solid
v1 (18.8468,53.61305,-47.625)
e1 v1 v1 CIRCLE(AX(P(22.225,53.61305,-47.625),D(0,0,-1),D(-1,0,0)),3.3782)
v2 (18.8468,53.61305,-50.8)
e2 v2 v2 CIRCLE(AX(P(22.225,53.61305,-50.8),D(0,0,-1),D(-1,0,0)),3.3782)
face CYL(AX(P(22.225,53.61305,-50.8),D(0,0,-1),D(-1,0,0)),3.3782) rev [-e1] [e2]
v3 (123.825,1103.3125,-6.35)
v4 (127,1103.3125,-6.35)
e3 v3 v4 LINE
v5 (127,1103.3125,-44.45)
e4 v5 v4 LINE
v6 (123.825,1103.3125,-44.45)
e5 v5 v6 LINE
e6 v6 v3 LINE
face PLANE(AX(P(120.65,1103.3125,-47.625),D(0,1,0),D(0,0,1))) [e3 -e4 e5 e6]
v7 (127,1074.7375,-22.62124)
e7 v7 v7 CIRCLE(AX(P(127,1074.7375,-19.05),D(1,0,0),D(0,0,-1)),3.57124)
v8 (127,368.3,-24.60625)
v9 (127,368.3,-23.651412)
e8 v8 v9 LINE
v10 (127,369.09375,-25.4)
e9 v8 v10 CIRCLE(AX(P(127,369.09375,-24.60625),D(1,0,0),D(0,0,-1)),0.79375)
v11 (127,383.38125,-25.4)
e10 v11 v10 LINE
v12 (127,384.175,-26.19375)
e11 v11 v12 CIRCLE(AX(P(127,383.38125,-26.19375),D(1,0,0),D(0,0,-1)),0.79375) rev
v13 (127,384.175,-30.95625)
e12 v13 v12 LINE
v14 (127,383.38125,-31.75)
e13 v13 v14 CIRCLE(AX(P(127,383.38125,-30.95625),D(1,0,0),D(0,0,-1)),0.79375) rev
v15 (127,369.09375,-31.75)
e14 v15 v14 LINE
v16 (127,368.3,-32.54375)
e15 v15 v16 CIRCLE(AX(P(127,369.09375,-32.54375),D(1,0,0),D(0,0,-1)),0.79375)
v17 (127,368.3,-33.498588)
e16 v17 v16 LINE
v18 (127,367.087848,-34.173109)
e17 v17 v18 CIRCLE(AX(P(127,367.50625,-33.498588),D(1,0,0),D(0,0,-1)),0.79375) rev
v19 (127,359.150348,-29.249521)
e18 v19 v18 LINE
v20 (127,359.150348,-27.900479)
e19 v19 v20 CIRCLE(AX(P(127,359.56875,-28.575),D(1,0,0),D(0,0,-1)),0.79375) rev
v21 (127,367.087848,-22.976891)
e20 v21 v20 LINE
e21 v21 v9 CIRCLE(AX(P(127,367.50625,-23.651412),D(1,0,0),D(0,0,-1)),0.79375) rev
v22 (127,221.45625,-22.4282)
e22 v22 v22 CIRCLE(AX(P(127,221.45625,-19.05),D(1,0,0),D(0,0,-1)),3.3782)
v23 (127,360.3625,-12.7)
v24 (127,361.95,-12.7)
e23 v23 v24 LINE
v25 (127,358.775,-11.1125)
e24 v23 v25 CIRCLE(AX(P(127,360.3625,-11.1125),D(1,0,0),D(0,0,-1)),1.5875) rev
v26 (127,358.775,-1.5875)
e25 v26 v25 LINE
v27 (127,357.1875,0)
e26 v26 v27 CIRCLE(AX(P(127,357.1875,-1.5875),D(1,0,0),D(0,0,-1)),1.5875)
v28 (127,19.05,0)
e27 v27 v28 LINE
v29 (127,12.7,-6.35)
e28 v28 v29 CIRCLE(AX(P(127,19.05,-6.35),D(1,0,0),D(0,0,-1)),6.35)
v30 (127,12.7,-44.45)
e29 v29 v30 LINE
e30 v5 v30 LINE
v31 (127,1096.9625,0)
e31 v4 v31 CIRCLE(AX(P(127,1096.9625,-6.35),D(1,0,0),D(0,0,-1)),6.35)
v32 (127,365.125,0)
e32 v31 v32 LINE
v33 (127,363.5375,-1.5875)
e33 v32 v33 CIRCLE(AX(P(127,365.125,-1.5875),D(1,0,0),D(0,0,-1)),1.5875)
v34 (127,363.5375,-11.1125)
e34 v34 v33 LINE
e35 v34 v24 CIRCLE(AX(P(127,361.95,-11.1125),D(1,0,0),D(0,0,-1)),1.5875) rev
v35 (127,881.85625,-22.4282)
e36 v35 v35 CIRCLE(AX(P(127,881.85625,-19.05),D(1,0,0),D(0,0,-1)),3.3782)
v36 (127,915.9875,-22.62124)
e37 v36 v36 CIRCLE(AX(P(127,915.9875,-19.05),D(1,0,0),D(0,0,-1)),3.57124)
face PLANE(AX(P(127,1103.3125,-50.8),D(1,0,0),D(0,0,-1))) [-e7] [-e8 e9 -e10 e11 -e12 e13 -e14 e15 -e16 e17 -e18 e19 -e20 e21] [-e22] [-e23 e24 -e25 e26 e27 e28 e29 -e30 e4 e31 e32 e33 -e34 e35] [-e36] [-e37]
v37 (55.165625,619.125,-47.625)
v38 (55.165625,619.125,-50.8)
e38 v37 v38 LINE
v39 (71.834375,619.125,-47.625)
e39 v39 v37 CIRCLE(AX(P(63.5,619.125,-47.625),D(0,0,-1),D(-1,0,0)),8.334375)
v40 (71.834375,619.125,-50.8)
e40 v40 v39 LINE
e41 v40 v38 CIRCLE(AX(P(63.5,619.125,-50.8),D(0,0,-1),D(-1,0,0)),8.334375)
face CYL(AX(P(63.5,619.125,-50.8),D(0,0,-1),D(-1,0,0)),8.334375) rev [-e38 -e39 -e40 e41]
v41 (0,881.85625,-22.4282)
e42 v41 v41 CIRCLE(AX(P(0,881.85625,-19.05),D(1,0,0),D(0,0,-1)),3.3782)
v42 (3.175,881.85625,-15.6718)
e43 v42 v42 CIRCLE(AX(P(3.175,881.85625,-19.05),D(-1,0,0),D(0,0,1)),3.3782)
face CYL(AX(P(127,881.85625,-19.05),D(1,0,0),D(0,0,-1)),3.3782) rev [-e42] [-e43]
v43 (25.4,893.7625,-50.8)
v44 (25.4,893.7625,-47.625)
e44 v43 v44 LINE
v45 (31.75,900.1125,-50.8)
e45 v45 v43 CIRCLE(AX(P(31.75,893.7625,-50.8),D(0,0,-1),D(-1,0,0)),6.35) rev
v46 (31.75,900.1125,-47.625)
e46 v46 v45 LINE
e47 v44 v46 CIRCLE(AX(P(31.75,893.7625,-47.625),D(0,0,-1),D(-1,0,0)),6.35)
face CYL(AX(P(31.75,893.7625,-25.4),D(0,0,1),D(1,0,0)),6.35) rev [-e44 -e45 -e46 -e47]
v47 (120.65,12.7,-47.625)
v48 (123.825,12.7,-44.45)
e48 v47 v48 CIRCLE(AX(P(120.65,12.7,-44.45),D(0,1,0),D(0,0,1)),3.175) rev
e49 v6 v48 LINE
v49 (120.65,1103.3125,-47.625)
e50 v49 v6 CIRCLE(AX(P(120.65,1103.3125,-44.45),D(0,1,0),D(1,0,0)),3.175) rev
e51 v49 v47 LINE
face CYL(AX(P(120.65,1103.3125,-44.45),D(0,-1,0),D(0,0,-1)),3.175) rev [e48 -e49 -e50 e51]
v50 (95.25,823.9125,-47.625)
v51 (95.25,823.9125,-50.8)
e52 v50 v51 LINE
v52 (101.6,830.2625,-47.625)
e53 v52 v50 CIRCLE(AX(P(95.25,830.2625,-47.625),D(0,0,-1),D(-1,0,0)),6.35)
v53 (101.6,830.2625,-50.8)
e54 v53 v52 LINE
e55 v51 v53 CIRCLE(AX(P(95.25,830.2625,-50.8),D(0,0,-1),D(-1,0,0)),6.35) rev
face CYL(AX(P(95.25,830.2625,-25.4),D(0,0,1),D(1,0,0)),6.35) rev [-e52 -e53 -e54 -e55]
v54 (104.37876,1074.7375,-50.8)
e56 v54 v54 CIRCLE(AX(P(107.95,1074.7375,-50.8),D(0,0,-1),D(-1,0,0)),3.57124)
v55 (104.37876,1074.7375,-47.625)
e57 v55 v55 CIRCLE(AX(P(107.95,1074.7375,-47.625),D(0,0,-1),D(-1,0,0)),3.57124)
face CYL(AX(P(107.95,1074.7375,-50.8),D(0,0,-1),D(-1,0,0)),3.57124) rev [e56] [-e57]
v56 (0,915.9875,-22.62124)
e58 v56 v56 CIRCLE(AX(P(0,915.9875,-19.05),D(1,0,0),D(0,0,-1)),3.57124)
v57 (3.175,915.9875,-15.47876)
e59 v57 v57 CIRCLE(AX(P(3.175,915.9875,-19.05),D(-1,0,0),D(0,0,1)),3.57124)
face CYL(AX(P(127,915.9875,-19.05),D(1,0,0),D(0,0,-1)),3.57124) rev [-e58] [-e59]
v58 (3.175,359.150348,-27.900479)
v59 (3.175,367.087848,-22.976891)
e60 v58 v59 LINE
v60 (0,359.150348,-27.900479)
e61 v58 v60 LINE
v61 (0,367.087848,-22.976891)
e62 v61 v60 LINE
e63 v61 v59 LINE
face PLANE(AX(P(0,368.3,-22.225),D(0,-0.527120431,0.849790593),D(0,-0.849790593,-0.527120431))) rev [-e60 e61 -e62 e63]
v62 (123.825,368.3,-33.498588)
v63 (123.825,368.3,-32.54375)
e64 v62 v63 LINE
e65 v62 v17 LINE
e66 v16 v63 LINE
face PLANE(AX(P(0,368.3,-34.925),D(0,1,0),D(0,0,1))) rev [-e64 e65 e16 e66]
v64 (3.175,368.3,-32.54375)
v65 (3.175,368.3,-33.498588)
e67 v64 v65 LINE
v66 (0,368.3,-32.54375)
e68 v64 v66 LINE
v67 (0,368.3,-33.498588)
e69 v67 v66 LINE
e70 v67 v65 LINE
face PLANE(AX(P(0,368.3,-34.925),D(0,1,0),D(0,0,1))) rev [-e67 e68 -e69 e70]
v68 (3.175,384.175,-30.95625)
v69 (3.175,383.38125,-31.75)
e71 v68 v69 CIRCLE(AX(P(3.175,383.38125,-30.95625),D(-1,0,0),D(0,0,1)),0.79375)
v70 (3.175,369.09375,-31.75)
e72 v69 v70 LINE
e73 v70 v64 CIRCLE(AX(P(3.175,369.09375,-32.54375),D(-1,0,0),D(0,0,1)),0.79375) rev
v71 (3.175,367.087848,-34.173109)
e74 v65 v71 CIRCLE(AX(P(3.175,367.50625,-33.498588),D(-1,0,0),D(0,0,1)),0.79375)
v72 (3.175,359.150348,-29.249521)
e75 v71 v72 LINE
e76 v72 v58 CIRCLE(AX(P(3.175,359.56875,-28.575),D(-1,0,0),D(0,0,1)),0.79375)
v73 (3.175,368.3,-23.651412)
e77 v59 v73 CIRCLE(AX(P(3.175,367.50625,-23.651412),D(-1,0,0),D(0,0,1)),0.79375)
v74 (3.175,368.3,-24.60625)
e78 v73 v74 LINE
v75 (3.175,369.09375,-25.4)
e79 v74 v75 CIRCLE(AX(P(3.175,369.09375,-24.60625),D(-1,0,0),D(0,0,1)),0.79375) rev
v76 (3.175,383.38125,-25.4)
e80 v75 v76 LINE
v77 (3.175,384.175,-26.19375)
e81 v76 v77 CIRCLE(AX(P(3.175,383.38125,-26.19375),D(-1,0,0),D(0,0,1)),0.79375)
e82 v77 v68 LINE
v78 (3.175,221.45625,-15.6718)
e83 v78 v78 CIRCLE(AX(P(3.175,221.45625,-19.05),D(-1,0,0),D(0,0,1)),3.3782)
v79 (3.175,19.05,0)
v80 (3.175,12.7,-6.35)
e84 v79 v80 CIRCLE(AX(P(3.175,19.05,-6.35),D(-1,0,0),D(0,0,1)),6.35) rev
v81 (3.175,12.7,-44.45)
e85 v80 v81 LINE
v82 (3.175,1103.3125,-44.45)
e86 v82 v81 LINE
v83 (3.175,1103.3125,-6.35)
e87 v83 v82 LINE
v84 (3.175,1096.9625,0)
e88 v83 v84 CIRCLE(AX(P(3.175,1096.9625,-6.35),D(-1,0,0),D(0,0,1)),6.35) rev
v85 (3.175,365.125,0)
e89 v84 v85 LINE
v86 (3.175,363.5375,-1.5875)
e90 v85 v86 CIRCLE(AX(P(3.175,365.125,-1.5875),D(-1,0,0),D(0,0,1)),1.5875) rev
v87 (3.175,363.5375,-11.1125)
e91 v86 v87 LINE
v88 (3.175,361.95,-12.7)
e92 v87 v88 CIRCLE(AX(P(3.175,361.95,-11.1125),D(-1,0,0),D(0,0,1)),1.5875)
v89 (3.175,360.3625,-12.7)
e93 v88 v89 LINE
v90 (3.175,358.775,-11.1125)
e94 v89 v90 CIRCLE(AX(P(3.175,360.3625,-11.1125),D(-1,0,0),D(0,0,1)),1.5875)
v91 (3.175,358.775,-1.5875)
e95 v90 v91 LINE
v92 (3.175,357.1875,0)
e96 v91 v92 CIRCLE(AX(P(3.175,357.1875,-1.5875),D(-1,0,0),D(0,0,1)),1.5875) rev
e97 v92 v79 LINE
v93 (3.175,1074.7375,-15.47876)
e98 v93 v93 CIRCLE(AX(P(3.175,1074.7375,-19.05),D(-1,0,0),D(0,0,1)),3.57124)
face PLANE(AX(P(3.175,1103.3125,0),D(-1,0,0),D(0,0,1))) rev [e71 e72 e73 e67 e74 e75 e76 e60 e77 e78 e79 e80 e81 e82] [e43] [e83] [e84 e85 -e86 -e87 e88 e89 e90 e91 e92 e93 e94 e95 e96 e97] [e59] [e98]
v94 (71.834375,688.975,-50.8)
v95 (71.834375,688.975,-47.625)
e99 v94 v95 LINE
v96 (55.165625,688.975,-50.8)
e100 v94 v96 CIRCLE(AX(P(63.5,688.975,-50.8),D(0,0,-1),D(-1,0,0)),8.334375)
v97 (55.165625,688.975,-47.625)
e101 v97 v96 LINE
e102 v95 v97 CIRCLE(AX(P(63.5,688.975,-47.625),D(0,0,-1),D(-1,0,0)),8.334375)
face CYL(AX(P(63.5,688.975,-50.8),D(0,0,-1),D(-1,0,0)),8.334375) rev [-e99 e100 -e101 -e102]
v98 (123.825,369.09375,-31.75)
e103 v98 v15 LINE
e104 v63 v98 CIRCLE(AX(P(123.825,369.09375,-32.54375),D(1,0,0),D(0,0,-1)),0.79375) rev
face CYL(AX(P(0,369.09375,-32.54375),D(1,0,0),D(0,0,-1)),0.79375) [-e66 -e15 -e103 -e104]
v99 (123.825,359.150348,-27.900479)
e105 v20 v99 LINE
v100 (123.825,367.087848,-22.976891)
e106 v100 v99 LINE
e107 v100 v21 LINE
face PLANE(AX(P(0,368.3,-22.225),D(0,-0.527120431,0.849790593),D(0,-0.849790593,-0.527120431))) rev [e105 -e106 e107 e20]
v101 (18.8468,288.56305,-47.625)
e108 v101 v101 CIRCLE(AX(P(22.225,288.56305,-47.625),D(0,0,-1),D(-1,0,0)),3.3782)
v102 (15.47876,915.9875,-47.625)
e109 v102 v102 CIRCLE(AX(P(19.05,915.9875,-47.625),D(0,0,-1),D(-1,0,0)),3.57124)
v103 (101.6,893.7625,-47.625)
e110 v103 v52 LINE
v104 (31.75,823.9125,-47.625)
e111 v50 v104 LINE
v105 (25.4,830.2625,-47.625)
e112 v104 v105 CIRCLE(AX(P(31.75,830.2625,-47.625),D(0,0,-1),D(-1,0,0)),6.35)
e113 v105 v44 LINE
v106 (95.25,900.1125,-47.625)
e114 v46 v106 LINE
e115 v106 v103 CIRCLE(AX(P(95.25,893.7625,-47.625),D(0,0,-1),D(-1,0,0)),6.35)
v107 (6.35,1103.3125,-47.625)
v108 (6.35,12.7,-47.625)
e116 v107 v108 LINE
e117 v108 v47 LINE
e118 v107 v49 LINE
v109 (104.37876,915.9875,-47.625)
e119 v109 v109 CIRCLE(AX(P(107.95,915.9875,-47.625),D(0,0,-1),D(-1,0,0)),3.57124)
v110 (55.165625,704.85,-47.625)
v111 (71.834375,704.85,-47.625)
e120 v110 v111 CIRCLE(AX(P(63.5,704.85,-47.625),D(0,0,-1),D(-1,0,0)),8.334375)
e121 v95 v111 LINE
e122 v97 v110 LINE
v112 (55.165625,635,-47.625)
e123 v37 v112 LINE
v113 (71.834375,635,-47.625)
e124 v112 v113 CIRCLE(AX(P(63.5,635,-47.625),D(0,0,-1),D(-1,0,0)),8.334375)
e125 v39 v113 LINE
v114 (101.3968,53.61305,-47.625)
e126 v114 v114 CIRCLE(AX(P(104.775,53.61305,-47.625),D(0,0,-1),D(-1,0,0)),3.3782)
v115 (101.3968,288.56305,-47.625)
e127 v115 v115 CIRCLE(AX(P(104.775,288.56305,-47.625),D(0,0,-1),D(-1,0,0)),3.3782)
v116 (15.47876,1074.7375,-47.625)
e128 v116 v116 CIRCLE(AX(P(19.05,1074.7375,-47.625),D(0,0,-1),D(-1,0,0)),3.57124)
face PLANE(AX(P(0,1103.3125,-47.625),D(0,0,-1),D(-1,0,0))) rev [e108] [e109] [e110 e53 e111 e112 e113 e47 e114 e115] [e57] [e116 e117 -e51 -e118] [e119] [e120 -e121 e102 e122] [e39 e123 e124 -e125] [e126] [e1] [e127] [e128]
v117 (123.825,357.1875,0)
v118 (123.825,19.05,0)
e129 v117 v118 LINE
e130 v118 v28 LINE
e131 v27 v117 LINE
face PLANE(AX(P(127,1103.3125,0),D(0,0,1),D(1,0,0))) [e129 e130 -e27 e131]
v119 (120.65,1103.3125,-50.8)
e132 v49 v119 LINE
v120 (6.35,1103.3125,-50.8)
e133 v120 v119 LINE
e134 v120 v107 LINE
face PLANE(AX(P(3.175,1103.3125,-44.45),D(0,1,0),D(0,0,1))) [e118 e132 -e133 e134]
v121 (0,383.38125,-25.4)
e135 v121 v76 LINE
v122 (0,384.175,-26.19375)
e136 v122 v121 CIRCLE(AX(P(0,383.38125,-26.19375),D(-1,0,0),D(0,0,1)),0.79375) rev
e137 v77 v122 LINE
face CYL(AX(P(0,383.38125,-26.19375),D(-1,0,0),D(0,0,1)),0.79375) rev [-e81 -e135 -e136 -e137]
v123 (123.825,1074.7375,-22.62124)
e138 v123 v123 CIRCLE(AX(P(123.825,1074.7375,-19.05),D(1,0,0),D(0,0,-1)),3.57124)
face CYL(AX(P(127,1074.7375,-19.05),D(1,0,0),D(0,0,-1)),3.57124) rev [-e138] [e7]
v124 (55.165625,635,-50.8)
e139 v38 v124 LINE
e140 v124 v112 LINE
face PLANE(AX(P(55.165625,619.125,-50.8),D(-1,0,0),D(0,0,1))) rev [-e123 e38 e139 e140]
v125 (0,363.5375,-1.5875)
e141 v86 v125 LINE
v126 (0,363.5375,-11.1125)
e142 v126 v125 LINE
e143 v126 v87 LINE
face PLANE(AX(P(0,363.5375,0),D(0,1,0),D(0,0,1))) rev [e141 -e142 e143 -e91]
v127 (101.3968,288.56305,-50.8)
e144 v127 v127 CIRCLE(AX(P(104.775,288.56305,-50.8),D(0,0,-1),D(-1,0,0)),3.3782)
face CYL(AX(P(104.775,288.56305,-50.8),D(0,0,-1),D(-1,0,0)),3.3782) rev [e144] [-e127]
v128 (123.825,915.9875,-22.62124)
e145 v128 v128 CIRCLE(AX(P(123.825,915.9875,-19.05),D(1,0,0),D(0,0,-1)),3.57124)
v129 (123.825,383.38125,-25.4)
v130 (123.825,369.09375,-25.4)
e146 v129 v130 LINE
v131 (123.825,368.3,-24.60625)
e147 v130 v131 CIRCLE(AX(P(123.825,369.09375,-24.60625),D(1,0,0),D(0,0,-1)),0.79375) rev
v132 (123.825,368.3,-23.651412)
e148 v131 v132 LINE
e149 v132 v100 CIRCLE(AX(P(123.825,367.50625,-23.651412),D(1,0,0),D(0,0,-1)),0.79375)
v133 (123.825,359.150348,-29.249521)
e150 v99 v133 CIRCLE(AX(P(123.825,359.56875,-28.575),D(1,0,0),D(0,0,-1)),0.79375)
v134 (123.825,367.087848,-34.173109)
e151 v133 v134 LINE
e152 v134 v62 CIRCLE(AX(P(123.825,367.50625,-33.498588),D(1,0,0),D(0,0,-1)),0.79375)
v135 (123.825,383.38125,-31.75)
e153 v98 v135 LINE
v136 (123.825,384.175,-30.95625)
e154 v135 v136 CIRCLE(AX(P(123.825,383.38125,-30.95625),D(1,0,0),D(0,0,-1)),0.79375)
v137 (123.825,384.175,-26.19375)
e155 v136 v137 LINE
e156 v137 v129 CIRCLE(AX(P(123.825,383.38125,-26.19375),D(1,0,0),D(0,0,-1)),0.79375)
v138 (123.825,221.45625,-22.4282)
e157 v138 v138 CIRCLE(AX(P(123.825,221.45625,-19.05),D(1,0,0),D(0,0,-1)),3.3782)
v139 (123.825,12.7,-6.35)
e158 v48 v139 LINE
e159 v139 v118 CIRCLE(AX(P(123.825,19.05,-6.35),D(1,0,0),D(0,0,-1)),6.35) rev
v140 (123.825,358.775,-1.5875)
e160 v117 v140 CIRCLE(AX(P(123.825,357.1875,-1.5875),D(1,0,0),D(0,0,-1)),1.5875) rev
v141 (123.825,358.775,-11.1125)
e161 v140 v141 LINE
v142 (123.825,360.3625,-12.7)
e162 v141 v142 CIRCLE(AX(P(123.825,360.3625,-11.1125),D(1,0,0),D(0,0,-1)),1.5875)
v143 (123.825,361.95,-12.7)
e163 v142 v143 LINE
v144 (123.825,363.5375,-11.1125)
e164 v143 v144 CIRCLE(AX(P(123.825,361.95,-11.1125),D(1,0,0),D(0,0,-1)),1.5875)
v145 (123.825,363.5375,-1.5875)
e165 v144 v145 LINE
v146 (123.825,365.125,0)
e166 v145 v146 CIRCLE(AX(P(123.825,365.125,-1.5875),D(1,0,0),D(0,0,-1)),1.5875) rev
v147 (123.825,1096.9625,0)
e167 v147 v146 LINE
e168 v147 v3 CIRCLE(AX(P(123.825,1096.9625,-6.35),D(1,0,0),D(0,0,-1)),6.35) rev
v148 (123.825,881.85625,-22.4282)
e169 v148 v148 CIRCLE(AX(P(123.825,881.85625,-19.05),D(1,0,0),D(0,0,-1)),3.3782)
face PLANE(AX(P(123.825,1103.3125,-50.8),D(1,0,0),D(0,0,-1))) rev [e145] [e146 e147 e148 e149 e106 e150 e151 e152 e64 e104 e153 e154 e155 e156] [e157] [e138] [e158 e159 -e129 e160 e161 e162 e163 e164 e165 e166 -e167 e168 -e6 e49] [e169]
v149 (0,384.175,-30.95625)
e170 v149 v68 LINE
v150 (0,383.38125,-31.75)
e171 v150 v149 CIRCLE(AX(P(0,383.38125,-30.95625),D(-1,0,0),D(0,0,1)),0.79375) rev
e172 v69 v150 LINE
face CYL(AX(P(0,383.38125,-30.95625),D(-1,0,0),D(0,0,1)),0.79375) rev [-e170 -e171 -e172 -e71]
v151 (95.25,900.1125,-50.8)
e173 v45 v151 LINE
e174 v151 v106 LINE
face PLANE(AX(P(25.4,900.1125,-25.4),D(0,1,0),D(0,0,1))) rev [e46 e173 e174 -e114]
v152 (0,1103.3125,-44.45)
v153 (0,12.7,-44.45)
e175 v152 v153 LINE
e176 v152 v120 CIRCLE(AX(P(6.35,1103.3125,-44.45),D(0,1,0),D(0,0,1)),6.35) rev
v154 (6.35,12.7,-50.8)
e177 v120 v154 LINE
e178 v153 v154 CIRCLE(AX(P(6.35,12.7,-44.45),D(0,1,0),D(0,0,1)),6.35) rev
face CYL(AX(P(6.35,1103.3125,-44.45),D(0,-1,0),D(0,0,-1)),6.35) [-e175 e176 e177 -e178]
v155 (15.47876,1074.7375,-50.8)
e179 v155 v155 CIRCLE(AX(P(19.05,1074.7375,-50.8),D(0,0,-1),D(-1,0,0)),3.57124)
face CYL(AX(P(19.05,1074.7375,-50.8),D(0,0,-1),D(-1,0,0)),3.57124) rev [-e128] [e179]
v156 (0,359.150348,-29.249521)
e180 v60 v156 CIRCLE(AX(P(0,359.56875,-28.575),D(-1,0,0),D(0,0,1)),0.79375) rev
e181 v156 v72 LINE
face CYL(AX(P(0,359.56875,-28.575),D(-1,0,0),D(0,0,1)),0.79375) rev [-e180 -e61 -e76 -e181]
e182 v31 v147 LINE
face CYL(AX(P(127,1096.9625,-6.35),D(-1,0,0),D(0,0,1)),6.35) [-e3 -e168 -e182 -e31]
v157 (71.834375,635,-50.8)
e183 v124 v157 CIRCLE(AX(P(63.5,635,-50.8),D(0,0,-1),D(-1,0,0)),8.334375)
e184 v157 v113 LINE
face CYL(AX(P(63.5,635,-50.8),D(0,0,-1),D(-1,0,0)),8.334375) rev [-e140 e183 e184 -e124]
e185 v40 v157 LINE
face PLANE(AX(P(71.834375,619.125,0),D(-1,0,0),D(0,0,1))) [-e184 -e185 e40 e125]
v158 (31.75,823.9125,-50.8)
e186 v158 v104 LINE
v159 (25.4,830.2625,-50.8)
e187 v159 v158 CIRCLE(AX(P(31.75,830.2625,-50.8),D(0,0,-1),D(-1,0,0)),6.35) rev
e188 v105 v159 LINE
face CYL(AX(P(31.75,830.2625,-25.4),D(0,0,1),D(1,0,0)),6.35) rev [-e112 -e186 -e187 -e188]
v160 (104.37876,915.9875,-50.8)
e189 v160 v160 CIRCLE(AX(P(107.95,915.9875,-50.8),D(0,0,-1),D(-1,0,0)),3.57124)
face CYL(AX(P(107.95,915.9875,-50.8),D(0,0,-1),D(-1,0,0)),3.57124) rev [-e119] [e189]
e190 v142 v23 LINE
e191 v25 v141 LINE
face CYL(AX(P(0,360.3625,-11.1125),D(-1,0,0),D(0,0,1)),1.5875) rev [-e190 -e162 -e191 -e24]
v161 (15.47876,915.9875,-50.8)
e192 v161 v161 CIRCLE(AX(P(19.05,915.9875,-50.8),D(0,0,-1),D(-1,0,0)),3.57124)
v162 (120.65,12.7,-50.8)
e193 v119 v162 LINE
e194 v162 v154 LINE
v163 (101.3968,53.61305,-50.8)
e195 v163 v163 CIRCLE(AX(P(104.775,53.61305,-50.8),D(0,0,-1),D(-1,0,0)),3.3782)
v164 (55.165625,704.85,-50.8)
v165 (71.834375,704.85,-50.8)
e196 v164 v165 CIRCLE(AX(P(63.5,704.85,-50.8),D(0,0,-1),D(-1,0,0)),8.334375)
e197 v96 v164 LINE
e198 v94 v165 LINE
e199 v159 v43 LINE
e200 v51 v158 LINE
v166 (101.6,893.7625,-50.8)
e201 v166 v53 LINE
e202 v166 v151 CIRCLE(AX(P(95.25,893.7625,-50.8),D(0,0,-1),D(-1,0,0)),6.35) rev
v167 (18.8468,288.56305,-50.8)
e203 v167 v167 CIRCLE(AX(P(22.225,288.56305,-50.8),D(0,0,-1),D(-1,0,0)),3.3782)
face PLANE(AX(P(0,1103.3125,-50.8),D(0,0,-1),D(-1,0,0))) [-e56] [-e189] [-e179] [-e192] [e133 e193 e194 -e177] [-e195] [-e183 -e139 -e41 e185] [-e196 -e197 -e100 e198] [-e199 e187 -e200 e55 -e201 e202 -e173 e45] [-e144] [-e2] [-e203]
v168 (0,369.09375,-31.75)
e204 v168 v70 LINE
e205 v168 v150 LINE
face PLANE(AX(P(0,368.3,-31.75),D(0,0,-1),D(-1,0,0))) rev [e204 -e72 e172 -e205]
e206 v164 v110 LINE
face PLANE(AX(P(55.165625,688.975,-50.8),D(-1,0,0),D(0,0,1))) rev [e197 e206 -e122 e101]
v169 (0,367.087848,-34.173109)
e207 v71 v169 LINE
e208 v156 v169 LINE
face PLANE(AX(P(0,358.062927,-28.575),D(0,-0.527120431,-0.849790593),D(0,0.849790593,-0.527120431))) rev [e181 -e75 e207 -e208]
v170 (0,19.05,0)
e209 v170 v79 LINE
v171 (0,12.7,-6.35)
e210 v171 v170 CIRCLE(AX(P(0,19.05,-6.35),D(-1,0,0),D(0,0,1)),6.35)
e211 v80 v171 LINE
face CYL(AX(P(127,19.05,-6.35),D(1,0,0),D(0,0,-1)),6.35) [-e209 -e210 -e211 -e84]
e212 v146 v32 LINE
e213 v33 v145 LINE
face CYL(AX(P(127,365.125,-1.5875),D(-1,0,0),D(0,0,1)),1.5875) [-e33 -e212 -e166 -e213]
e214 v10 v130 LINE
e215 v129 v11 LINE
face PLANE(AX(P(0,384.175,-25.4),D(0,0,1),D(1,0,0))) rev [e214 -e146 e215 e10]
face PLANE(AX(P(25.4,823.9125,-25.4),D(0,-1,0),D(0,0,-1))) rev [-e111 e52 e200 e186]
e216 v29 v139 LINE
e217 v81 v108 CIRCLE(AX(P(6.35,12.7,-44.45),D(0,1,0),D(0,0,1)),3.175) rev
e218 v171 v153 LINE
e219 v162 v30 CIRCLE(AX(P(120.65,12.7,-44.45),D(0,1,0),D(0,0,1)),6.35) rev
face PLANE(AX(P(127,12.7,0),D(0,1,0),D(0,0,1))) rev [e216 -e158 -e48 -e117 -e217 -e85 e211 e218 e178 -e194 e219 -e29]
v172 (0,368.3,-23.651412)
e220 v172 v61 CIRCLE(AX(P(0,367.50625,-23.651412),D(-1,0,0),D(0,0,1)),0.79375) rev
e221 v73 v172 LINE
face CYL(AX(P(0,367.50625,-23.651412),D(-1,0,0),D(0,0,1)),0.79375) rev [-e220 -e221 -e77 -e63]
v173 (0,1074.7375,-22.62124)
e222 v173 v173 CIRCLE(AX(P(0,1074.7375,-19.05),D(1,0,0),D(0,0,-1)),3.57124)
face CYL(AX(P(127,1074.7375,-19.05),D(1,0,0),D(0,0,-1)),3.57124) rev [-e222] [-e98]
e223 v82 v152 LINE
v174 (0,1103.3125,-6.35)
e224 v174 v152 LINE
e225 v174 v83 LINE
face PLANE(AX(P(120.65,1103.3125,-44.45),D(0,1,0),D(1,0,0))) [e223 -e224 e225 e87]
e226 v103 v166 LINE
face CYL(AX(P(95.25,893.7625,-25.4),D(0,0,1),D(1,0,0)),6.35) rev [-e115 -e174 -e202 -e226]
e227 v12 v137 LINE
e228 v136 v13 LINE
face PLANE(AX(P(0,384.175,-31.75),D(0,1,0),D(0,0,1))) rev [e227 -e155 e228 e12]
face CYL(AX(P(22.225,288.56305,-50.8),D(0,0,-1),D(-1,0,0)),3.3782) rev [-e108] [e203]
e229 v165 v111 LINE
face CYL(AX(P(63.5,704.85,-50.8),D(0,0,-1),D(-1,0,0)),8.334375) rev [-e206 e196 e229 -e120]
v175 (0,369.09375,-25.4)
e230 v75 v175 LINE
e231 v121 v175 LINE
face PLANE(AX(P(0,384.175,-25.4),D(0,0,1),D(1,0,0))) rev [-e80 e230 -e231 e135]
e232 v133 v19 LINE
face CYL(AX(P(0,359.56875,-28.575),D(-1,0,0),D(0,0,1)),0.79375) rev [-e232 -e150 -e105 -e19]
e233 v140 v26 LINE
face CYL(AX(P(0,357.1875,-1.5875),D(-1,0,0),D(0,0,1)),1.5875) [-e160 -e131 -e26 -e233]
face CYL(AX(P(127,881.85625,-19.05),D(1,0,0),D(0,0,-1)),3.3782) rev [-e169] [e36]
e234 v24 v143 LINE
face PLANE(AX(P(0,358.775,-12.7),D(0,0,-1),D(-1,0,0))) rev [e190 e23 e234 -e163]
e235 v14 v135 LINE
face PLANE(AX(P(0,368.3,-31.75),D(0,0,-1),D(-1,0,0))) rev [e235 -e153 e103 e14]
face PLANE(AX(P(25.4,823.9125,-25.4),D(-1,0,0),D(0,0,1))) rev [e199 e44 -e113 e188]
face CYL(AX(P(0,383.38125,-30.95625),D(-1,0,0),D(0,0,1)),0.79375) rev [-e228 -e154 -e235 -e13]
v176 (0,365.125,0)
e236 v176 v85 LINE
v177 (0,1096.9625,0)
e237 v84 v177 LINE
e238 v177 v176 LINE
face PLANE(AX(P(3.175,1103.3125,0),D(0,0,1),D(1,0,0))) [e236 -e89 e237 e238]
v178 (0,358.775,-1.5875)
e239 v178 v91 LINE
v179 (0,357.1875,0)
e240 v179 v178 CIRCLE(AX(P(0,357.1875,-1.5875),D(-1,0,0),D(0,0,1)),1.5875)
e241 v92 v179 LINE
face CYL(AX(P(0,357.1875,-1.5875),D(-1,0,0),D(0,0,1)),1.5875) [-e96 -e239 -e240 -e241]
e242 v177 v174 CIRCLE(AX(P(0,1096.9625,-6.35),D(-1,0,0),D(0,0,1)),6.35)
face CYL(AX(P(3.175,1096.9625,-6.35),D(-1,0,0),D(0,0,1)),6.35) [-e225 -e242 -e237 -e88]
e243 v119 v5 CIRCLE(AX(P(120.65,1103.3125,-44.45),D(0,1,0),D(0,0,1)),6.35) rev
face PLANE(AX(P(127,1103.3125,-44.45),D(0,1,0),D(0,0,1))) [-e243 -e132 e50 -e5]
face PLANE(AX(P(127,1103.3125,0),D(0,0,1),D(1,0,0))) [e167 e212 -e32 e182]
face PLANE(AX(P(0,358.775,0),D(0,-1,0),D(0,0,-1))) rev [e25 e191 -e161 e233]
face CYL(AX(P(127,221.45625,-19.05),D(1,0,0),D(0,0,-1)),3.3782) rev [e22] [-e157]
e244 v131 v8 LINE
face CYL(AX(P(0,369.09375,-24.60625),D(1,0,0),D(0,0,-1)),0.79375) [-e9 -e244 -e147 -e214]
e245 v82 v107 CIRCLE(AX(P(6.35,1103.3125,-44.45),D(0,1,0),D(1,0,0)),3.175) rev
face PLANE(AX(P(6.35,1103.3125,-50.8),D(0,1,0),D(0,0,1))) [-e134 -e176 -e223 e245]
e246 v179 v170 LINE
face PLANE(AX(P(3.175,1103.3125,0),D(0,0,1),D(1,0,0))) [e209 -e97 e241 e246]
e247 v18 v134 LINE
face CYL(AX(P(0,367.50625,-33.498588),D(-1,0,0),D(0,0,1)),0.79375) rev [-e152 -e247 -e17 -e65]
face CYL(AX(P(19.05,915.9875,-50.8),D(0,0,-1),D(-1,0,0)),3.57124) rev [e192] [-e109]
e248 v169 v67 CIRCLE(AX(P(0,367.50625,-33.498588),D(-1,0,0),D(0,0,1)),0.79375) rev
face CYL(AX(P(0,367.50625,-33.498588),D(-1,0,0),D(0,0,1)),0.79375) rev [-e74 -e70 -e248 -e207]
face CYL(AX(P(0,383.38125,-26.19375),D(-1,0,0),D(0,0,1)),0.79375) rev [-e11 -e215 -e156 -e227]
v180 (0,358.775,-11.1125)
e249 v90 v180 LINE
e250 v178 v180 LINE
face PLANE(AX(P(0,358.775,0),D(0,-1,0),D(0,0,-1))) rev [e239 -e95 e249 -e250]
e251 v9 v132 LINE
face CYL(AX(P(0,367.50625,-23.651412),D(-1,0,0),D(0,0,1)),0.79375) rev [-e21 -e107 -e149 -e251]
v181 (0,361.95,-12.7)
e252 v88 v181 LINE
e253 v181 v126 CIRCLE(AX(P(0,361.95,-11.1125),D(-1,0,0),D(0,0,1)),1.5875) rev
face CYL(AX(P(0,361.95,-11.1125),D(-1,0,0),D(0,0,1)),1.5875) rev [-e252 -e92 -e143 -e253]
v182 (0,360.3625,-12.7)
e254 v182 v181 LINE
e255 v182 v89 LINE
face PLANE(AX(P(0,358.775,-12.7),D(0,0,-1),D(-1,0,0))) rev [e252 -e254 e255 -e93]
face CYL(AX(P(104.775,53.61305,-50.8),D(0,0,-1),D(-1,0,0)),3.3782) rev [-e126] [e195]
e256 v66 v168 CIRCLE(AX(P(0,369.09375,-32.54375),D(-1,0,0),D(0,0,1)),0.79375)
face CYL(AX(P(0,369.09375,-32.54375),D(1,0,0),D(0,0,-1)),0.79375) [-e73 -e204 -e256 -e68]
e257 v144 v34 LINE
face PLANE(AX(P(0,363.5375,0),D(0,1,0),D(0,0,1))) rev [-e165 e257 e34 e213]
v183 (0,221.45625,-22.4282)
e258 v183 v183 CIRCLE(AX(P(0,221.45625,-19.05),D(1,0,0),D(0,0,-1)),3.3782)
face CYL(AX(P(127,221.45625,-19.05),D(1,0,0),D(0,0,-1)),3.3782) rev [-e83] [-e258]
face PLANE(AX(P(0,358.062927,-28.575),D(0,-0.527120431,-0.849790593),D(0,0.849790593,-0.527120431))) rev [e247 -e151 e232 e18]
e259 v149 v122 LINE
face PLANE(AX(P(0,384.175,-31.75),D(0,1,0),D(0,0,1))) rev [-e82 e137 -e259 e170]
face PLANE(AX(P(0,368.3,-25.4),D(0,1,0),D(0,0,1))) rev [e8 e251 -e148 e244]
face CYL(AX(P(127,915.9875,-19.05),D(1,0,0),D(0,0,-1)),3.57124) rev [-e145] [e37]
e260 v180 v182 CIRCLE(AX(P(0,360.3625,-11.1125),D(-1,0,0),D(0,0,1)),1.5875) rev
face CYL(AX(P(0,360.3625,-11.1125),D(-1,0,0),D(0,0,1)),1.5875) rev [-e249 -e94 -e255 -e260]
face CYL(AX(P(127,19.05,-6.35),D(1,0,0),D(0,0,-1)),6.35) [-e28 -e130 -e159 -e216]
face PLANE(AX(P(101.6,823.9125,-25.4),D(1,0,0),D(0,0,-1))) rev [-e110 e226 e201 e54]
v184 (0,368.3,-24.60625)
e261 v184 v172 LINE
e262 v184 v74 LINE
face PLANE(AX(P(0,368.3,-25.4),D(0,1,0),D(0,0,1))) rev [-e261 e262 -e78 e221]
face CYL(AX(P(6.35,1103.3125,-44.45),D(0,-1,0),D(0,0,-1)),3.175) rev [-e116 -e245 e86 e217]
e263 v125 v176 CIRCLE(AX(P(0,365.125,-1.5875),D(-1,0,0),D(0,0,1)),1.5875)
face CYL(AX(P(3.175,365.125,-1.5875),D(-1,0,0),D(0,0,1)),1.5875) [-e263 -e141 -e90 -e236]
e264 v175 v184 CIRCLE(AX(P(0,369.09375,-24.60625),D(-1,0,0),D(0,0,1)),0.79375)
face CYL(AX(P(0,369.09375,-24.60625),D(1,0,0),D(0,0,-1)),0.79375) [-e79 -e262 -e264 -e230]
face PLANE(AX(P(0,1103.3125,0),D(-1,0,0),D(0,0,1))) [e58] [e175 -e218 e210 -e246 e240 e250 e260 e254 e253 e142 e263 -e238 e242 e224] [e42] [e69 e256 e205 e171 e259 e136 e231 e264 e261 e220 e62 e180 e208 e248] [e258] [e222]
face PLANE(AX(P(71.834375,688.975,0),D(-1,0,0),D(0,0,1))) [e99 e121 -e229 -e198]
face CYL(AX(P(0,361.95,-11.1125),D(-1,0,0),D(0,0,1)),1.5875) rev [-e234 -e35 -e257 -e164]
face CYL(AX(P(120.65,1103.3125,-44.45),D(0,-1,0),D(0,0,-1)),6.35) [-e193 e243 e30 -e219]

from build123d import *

# Parameters (mm, degrees)
BASE_FLANGE1_DEPTH          = 1103.3125
SKETCH29_W                  = 76.2
SKETCH29_H                  = 76.2
CUT_EXTRUDE1_DEPTH          = 25.4
F_1_4_CLEARANCE_HOLE5_D     = 6.7564
F_1_4_CLEARANCE_HOLE2_D     = 7.14248
F_1_4_CLEARANCE_HOLE3_D     = 7.14248
F_1_4_CLEARANCE_HOLE4_D     = 6.7564
F_1_2_START                 = -50.8
F_1_2_CLEARANCE_SLOT1_DEPTH = 3.175
SKETCH53_W                  = 50.8
SKETCH53_H                  = 12.7
CUT_EXTRUDE2_DEPTH          = 1112.759017349
TOP_FLANGE_FILLET_R         = 6.35
INTERIOR_CUT_FILLET_R       = 6.35
BOTTOM_EDGE_FILLET_R        = 6.35
SKETCH54_W                  = 12.7
SKETCH54_H                  = 4.7625
CUT_EXTRUDE3_DEPTH          = 1112.759017349
FILLET1_R                   = 0.79375
FILLET2_R                   = 1.5875


# Read off the part's stored shape, not the designer's step: 1/2 Clearance Slot1
# Sheet-metal steps are written as plain solids
with BuildPart() as part:
    # Sketch1 → Base-Flange1 (new body)
    with BuildSketch(Plane(origin=(0, 0, 0), x_dir=(1, 0, 0), z_dir=(0, 1, 0))):
        with BuildLine():
            Line((0, 0), (0, 44.45))
            ThreePointArc((0, 44.45), (1.859871939, 48.940128061), (6.35, 50.8))
            Line((6.35, 50.8), (120.65, 50.8))
            ThreePointArc((120.65, 50.8), (125.140128061, 48.940128061), (127, 44.45))
            Line((127, 44.45), (127, 0))
            Line((127, 0), (123.825, 0))
            Line((123.825, 0), (123.825, 44.45))
            ThreePointArc((123.825, 44.45), (122.89506403, 46.69506403), (120.65, 47.625))
            Line((120.65, 47.625), (6.35, 47.625))
            ThreePointArc((6.35, 47.625), (4.10493597, 46.69506403), (3.175, 44.45))
            Line((3.175, 44.45), (3.175, 0))
            Line((3.175, 0), (0, 0))
        make_face()
    extrude(amount=BASE_FLANGE1_DEPTH)

    # Sketch29 → Cut-Extrude1 (cut)
    with BuildSketch(Plane(origin=(0, 0, -50.8), x_dir=(-1, 0, 0), z_dir=(0, 0, -1))):
        with Locations((-63.5, 862.0125)):
            Rectangle(SKETCH29_W, SKETCH29_H)
    extrude(amount=-CUT_EXTRUDE1_DEPTH, mode=Mode.SUBTRACT)

    # 1/4 Clearance Hole5 (through all)
    with Locations(Plane(origin=(0, 0, -50.8), x_dir=(-1, 0, 0), z_dir=(0, 0, -1))):
        with Locations((-104.775, 53.61305), (-104.775, 288.56305), (-22.225, 288.56305), (-22.225, 53.61305)):
            Hole(F_1_4_CLEARANCE_HOLE5_D / 2)

    # 1/4 Clearance Hole2 (through all)
    with Locations(Plane(origin=(127, 0, 0), x_dir=(0, 0, -1), z_dir=(1, 0, 0))):
        with Locations((19.05, 1074.7375), (19.05, 915.9875)):
            Hole(F_1_4_CLEARANCE_HOLE2_D / 2)

    # 1/4 Clearance Hole3 (through all)
    with Locations(Plane(origin=(0, 0, -50.8), x_dir=(-1, 0, 0), z_dir=(0, 0, -1))):
        with Locations((-107.95, 1074.7375), (-19.05, 1074.7375), (-19.05, 915.9875), (-107.95, 915.9875)):
            Hole(F_1_4_CLEARANCE_HOLE3_D / 2)

    # 1/4 Clearance Hole4 (through all)
    with Locations(Plane(origin=(127, 0, 0), x_dir=(0, 0, -1), z_dir=(1, 0, 0))):
        with Locations((19.05, 221.45625), (19.05, 881.85625)):
            Hole(F_1_4_CLEARANCE_HOLE4_D / 2)

    # 1/2 Clearance Slot1 outline → 1/2 Clearance Slot1 (cut)
    with BuildSketch(Plane.XY.offset(F_1_2_START)):
        with BuildLine():
            Line((71.834375, 619.125), (71.834375, 635))
            ThreePointArc((71.834375, 635), (63.5, 643.334375), (55.165625, 635))
            Line((55.165625, 635), (55.165625, 619.125))
            ThreePointArc((55.165625, 619.125), (63.5, 610.790625), (71.834375, 619.125))
        make_face()
        with BuildLine():
            Line((71.834375, 688.975), (71.834375, 704.85))
            ThreePointArc((71.834375, 704.85), (63.5, 713.184375), (55.165625, 704.85))
            Line((55.165625, 704.85), (55.165625, 688.975))
            ThreePointArc((55.165625, 688.975), (63.5, 680.640625), (71.834375, 688.975))
        make_face()
    extrude(amount=F_1_2_CLEARANCE_SLOT1_DEPTH, mode=Mode.SUBTRACT)

    # Sketch53 → Cut-Extrude2 (cut, through all)
    with BuildSketch(Plane.ZY):
        with Locations((-25.4, 6.35)):
            Rectangle(SKETCH53_W, SKETCH53_H)
    extrude(amount=-CUT_EXTRUDE2_DEPTH, mode=Mode.SUBTRACT)

    # top flange fillet
    top_flange_fillet_edges = [part.edges().sort_by_distance(p)[0] for p in [
        (125.4125, 12.7, 0),
        (1.5875, 12.7, 0),
    ]]
    fillet(top_flange_fillet_edges, radius=TOP_FLANGE_FILLET_R)

    # interior cut fillet
    interior_cut_fillet_edges = [part.edges().sort_by_distance(p)[0] for p in [
        (25.4, 900.1125, -49.2125),
        (25.4, 823.9125, -49.2125),
        (101.6, 823.9125, -49.2125),
        (101.6, 900.1125, -49.2125),
    ]]
    fillet(interior_cut_fillet_edges, radius=INTERIOR_CUT_FILLET_R)

    # bottom edge fillet
    bottom_edge_fillet_edges = [part.edges().sort_by_distance(p)[0] for p in [
        (1.5875, 1103.3125, 0),
        (125.4125, 1103.3125, 0),
    ]]
    fillet(bottom_edge_fillet_edges, radius=BOTTOM_EDGE_FILLET_R)

    # Sketch54 → Cut-Extrude3 (cut, through all)
    with BuildSketch(Plane(origin=(127, 0, 0), x_dir=(0, 0, -1), z_dir=(1, 0, 0))):
        with Locations((6.35, 361.15625)):
            Rectangle(SKETCH54_W, SKETCH54_H)
        Polygon((28.575, 358.06292713), (34.925, 368.3), (31.75, 368.3), (31.75, 384.175), (25.4, 384.175), (25.4, 368.3), (22.225, 368.3), align=None)
    extrude(amount=-CUT_EXTRUDE3_DEPTH, mode=Mode.SUBTRACT)

    # Fillet1
    fillet1_edges = [part.edges().sort_by_distance(p)[0] for p in [
        (125.4125, 358.06292713, -28.575),
        (1.5875, 358.06292713, -28.575),
        (125.4125, 368.3, -22.225),
        (1.5875, 368.3, -22.225),
        (125.4125, 368.3, -25.4),
        (1.5875, 368.3, -25.4),
        (125.4125, 384.175, -25.4),
        (1.5875, 384.175, -25.4),
        (125.4125, 384.175, -31.75),
        (1.5875, 384.175, -31.75),
        (125.4125, 368.3, -31.75),
        (1.5875, 368.3, -31.75),
        (125.4125, 368.3, -34.925),
        (1.5875, 368.3, -34.925),
    ]]
    fillet(fillet1_edges, radius=FILLET1_R)

    # Fillet2
    fillet2_edges = [part.edges().sort_by_distance(p)[0] for p in [
        (125.4125, 358.775, 0),
        (1.5875, 358.775, 0),
        (125.4125, 363.5375, 0),
        (1.5875, 363.5375, 0),
        (125.4125, 363.5375, -12.7),
        (1.5875, 363.5375, -12.7),
        (125.4125, 358.775, -12.7),
        (1.5875, 358.775, -12.7),
    ]]
    fillet(fillet2_edges, radius=FILLET2_R)


solid = part.part
